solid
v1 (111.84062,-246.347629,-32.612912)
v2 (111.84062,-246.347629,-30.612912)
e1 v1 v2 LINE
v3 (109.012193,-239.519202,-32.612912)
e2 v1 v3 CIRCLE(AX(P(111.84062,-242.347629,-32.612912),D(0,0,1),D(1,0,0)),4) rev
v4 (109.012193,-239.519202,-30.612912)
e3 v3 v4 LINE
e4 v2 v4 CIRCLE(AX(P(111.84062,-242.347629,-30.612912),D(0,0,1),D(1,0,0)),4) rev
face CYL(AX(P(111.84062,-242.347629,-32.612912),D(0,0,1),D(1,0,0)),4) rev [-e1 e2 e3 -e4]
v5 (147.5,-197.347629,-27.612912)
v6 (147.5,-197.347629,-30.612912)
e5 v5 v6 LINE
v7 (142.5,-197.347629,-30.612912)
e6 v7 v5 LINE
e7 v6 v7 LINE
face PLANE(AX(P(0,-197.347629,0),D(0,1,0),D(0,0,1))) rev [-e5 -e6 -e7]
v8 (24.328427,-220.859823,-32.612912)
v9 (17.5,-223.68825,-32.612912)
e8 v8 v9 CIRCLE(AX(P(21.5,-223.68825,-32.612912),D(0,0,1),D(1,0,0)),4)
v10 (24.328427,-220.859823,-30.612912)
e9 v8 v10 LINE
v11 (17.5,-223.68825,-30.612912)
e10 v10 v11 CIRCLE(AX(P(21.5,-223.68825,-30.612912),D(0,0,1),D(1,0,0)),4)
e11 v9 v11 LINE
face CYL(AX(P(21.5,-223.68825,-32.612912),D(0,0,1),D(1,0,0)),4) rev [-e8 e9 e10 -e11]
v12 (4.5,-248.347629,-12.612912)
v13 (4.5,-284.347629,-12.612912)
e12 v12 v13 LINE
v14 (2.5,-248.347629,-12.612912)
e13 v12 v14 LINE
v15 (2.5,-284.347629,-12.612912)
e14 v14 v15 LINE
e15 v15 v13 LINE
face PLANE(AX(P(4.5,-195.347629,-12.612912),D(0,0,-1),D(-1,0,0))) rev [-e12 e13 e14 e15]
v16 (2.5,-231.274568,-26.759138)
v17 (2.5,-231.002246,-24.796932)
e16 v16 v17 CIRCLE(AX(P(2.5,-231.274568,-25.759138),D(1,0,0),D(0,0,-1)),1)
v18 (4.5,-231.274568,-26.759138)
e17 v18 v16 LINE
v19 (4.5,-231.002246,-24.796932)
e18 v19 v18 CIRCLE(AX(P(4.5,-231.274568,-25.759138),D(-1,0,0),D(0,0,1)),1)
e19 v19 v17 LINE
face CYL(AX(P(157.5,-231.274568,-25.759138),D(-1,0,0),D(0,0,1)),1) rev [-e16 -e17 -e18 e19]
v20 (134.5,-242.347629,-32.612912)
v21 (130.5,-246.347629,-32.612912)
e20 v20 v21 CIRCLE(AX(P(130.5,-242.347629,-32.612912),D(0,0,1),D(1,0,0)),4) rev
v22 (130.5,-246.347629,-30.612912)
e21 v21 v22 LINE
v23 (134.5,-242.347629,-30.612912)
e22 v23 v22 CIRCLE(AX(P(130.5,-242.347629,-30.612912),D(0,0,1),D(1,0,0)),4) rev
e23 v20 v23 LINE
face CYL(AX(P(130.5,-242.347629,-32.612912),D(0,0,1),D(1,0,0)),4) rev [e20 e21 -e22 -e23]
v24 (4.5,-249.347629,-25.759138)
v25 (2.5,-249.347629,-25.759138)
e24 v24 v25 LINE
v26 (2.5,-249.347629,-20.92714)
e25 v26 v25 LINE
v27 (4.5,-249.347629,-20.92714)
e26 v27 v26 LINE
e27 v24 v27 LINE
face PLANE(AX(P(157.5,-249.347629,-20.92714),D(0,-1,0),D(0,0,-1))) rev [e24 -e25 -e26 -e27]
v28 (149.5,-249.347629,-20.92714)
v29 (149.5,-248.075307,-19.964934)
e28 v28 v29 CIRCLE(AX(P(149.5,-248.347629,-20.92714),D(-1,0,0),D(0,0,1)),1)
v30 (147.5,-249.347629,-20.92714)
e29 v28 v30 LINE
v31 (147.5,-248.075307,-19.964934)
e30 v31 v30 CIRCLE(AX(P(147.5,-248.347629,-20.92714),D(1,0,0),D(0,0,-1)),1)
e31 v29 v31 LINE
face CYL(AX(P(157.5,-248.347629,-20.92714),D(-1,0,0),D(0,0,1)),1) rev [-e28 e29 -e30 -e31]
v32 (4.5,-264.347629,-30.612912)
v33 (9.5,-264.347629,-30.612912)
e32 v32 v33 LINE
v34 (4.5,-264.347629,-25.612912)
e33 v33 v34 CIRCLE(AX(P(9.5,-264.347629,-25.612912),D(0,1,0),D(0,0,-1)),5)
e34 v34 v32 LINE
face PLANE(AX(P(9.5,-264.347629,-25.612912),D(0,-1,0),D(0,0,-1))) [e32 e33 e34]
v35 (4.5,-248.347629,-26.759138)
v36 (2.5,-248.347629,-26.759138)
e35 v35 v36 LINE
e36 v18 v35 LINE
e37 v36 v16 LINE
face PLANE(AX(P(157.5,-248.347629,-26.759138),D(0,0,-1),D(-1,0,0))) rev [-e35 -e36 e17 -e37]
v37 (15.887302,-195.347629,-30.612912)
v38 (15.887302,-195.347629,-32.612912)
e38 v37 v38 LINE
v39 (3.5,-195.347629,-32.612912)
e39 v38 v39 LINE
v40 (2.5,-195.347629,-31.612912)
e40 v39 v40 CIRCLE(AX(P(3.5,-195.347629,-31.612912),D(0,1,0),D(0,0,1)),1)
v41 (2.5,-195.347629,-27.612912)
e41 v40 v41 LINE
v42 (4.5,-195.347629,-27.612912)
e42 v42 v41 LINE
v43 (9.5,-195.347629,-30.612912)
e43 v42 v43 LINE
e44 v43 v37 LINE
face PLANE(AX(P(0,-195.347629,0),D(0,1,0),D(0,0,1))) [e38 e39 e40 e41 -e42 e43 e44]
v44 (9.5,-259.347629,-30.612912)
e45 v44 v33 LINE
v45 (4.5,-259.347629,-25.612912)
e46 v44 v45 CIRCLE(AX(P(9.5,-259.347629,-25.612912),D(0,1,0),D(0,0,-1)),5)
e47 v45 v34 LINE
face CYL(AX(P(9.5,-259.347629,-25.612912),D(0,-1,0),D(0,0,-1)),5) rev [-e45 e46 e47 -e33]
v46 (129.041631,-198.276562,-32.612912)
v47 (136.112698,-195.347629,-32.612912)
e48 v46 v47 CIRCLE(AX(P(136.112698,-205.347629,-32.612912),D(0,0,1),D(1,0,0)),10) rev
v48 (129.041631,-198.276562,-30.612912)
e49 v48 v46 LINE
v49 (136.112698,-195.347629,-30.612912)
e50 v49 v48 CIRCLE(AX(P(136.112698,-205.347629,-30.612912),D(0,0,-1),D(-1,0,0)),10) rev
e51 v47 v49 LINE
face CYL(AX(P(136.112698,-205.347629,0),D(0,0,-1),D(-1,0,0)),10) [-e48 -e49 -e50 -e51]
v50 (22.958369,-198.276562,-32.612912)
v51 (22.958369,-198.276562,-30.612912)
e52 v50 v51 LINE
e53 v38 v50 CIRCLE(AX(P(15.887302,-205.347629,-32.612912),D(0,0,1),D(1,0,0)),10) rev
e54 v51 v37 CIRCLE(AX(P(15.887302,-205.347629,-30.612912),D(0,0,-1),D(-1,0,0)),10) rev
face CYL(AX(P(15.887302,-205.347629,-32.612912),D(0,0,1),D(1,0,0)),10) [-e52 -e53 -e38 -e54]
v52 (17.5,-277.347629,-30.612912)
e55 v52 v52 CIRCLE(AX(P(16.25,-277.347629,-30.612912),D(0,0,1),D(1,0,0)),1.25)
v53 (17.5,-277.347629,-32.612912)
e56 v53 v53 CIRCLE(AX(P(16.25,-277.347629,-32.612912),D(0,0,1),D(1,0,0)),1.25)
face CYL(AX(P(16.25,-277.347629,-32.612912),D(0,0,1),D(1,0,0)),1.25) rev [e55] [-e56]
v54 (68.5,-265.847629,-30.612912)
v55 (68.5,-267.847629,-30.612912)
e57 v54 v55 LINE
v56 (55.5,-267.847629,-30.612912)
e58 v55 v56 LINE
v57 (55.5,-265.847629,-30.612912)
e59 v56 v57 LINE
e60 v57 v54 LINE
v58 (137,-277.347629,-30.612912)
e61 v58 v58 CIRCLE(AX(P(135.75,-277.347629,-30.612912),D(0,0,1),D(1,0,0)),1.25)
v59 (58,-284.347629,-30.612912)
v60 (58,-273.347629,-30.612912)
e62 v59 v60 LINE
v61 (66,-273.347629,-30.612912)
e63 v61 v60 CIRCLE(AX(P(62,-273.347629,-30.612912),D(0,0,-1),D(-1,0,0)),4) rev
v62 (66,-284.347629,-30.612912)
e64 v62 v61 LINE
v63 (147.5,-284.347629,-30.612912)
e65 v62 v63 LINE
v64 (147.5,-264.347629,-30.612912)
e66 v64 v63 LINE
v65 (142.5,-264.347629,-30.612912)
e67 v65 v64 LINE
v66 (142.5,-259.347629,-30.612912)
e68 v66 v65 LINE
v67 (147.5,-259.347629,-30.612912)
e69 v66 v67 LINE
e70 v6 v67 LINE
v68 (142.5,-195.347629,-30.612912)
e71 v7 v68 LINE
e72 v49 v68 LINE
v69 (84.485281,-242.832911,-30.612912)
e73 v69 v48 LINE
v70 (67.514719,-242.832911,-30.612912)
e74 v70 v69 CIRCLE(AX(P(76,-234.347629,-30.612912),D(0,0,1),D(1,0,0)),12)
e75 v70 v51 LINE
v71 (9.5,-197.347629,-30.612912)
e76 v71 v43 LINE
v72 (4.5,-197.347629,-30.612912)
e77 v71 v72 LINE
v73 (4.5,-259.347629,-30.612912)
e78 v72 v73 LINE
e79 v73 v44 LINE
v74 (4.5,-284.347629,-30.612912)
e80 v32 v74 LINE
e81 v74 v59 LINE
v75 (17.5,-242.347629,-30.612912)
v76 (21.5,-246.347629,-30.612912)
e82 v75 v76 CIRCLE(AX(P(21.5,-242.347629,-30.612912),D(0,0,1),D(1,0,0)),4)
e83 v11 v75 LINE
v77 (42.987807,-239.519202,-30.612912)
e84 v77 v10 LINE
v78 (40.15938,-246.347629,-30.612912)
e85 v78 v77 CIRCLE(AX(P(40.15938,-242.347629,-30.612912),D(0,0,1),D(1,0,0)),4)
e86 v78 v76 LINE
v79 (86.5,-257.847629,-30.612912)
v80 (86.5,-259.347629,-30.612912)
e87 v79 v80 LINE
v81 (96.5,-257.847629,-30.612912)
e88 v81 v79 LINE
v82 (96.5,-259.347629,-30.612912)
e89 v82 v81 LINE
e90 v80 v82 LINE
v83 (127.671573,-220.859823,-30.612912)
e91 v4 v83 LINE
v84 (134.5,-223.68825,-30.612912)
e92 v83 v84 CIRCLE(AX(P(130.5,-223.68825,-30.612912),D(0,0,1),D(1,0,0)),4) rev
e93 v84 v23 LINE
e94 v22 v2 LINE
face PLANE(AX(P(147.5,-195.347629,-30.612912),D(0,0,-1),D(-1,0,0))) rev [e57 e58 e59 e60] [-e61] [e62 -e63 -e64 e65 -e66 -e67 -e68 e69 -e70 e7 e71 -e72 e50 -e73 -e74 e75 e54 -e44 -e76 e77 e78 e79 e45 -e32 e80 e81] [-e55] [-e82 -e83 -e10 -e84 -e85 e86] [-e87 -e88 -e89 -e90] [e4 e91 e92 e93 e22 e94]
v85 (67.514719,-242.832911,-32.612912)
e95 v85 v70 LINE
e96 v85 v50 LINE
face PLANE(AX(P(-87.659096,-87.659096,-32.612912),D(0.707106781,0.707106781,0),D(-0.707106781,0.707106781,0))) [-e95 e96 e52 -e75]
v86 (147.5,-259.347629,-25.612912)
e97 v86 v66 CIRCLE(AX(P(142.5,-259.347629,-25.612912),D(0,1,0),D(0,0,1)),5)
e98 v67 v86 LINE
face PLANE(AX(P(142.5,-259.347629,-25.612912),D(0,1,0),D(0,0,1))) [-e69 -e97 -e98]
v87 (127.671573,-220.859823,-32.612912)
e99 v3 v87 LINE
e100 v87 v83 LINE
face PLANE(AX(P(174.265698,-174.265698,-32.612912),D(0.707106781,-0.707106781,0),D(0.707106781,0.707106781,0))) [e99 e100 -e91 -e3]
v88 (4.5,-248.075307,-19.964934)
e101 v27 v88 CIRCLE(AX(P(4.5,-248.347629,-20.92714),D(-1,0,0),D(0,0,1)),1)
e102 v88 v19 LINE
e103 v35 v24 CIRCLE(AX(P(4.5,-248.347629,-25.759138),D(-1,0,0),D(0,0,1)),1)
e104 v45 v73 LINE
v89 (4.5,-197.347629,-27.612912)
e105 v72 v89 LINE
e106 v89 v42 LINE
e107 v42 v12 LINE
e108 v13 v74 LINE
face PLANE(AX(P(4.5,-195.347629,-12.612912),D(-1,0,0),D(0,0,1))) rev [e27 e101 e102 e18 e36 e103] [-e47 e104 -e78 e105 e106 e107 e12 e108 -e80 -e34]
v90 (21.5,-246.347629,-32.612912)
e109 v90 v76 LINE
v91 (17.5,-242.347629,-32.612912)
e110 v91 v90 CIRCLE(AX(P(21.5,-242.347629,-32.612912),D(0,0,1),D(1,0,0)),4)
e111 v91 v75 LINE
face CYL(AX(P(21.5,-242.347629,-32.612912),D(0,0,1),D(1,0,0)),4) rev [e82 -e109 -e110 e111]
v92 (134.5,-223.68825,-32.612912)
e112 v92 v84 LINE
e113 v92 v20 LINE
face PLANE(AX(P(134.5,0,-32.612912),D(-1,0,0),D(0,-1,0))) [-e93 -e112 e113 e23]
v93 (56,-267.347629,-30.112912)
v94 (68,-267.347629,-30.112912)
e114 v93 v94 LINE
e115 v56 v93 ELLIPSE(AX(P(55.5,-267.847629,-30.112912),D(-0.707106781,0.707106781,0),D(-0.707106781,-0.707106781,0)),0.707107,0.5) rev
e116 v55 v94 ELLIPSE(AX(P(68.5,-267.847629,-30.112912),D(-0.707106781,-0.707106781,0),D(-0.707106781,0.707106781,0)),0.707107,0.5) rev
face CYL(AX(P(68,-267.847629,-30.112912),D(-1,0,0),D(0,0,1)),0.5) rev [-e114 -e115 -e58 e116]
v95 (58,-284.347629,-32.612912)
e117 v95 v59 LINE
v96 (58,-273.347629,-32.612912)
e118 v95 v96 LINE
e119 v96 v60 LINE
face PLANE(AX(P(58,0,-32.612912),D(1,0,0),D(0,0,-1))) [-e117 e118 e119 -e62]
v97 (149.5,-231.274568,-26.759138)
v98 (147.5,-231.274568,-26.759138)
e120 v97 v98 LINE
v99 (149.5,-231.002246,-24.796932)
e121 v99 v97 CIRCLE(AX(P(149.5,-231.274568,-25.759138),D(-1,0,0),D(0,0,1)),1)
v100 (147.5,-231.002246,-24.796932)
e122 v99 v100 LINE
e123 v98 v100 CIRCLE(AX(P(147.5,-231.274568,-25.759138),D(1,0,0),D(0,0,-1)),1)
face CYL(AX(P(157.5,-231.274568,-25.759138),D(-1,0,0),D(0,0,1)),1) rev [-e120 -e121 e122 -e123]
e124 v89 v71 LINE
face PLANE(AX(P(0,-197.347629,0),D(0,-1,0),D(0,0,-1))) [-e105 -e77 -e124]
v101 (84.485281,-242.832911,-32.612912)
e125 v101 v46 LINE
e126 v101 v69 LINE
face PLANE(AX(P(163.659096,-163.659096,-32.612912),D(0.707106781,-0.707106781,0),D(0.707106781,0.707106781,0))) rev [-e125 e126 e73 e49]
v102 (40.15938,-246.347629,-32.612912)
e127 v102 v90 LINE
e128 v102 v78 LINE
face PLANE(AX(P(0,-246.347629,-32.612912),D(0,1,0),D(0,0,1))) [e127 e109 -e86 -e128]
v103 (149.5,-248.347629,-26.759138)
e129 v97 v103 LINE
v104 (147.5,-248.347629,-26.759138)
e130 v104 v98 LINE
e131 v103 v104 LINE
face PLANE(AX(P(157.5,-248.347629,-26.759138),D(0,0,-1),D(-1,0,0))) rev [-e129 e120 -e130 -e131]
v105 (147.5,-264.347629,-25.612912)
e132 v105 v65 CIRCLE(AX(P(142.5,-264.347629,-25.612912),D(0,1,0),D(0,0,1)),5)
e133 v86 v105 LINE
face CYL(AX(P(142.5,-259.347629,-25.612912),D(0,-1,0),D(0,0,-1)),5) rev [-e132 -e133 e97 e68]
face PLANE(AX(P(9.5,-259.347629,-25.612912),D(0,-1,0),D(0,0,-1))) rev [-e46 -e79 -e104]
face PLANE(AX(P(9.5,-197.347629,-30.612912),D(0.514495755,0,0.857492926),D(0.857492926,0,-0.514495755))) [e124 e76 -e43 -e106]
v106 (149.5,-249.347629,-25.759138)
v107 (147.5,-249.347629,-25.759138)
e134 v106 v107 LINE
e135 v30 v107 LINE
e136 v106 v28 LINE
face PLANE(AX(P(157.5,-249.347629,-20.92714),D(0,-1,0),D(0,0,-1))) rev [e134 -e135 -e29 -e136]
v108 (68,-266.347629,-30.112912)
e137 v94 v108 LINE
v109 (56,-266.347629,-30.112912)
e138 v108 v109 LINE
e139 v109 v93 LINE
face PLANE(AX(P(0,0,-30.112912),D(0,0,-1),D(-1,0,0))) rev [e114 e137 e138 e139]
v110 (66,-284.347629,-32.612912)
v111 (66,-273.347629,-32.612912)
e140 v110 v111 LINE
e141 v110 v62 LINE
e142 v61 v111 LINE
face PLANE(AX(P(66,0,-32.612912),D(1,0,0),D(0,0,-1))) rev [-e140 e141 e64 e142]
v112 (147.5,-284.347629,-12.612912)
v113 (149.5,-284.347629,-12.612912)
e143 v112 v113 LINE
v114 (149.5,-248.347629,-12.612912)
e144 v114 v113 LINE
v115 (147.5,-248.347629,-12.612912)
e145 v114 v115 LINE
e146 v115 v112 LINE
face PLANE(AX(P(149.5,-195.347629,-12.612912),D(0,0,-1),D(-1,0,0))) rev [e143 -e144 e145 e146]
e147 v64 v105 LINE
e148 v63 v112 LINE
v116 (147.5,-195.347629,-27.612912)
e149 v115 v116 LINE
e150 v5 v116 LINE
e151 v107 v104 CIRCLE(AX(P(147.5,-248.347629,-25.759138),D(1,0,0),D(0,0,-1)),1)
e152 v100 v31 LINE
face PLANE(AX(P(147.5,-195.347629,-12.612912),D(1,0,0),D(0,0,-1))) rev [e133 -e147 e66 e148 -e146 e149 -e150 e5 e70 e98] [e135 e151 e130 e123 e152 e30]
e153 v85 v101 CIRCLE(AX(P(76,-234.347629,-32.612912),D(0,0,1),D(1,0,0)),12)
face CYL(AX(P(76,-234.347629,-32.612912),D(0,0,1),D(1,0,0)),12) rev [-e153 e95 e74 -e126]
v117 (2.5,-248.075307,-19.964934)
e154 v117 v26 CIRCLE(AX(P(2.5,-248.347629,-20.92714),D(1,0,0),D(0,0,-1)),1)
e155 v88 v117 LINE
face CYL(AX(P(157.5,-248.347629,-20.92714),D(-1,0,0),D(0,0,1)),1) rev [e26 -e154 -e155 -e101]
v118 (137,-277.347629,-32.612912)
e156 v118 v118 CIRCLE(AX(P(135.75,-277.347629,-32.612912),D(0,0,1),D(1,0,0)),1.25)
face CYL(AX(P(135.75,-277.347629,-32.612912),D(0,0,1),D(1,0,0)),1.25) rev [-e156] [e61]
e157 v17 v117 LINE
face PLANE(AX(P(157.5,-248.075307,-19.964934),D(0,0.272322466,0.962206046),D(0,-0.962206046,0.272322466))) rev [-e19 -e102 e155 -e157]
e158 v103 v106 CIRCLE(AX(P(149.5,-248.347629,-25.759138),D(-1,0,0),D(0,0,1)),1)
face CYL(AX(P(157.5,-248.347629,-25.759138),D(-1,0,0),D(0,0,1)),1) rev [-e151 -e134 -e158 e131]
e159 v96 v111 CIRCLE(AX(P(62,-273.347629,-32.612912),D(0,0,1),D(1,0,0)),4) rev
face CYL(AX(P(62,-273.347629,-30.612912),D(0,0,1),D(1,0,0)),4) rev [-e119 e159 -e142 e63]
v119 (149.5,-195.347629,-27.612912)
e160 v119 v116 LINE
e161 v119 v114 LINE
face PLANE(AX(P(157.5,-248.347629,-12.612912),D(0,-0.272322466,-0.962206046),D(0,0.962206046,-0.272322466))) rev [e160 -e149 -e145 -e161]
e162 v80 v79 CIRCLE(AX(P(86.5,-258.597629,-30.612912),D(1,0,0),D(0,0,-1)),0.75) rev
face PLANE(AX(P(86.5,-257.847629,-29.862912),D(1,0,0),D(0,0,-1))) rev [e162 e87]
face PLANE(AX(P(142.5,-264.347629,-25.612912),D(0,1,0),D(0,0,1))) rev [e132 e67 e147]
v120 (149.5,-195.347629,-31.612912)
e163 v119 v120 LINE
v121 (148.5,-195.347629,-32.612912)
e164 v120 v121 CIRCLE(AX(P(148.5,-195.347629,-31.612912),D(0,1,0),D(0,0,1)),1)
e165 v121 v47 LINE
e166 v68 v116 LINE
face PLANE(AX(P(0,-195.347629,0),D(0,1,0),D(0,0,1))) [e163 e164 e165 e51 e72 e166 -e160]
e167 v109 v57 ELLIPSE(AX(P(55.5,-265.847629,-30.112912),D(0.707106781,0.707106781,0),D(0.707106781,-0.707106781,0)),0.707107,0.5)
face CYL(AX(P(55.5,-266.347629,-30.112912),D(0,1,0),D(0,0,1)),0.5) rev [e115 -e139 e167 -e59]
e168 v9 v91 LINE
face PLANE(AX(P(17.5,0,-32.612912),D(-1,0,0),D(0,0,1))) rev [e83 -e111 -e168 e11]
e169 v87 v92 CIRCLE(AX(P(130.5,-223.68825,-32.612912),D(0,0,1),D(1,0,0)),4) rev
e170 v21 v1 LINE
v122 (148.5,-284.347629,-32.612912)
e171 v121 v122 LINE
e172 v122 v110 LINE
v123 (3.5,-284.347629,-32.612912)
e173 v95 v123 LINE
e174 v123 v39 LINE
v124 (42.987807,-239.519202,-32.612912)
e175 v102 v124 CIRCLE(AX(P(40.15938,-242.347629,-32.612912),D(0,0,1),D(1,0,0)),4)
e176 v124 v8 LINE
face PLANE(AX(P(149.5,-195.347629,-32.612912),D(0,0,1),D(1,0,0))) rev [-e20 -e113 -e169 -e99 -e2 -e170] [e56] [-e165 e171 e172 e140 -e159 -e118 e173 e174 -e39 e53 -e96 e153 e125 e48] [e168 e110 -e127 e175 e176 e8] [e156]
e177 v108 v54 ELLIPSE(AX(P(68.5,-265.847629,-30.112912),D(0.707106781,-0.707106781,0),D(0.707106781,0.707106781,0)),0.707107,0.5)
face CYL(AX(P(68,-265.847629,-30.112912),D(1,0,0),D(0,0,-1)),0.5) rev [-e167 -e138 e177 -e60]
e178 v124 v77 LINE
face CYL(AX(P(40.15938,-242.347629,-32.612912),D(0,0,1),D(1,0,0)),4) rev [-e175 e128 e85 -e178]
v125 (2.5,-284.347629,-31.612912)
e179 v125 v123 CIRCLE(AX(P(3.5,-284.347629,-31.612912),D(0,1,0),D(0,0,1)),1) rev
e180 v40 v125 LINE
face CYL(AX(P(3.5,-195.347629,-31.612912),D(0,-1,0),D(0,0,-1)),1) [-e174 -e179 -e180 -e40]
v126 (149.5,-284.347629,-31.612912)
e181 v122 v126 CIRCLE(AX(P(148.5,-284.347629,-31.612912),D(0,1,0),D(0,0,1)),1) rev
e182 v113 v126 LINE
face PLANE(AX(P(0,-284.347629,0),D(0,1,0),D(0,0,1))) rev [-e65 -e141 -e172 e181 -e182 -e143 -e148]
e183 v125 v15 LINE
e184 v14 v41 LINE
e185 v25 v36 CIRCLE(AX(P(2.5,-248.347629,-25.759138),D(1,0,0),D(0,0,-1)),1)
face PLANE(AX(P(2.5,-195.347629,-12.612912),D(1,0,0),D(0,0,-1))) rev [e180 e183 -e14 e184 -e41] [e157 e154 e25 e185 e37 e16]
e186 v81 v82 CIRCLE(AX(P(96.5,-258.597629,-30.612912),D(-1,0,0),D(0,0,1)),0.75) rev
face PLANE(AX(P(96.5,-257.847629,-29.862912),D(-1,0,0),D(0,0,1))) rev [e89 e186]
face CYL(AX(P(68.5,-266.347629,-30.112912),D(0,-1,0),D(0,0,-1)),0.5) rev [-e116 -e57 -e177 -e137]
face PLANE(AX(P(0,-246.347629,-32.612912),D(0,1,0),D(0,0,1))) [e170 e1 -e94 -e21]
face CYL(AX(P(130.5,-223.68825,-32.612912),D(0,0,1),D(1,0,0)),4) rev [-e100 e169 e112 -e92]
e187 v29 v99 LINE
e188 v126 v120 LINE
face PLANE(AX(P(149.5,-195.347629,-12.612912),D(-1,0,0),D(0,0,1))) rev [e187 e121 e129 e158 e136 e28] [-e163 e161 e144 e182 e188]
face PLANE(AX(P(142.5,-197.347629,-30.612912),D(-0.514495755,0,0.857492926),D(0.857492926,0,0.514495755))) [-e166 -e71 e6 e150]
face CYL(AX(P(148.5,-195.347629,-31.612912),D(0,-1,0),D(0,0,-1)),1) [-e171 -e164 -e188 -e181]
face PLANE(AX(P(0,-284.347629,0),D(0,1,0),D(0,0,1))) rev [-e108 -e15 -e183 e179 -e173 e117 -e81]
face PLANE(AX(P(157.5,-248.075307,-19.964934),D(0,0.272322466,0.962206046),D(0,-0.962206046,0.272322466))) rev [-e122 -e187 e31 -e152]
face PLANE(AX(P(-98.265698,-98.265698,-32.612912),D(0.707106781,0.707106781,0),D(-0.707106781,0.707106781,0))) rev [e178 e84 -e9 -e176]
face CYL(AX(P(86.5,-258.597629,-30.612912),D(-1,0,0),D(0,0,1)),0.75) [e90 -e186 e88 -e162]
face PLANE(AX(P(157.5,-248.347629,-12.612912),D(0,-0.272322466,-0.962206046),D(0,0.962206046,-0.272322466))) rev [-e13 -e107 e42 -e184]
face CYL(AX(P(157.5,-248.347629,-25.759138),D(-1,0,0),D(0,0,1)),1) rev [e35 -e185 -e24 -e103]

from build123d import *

# Parameters (mm, degrees)
RESSALTO_EXTRUS_O3_DEPTH   = 89
FILETE3_R                  = 1
ESBO_O16_W                 = 12
ESBO_O16_H                 = 1
RESSALTO_EXTRUS_O5_DEPTH   = 0.5
FILETE7_R                  = 0.5
CORTE_EXTRUS_O9_DEPTH      = 200
CORTE_EXTRUS_O9_DEPTH_BACK = 10
ESBO_O22_R                 = 1.25
ESBO_O22_W                 = 8
ESBO_O22_H                 = 15
CORTE_EXTRUS_O10_DEPTH     = 322.757399842
RESSALTO_EXTRUS_O8_DEPTH   = 2
FILETE12_R                 = 10
FILETE13_R                 = 4
ESBO_O30_W                 = 10
ESBO_O30_H                 = 1.5
RESSALTO_EXTRUS_O10_DEPTH  = 0.75
FILETE14_R                 = 0.75
RESSALTO_EXTRUS_O11_START  = -20
RESSALTO_EXTRUS_O11_DEPTH  = 5


with BuildPart() as part:
    # Esboço6 → Ressalto-extrusão3 (new body)
    with BuildSketch(Plane(origin=(0, -284.347629413, 0), x_dir=(1, 0, 0), z_dir=(0, 1, 0))):
        Polygon((4.5, 12.61291239), (2.5, 12.61291239), (2.5, 32.61291239), (149.5, 32.61291239), (149.5, 12.61291239), (147.5, 12.61291239), (147.5, 30.61291239), (4.5, 30.61291239), align=None)
    extrude(amount=RESSALTO_EXTRUS_O3_DEPTH)

    # Filete3
    filete3_edges = [part.edges().sort_by_distance(p)[0] for p in [
        (2.5, -239.847629413, -32.61291239),
        (149.5, -239.847629413, -32.61291239),
    ]]
    fillet(filete3_edges, radius=FILETE3_R)

    # Esboço16 → Ressalto-extrusão5 (add)
    with BuildSketch(Plane.XY.offset(-30.61291239)):
        with Locations((62, -266.847629413)):
            Rectangle(ESBO_O16_W, ESBO_O16_H)
    extrude(amount=RESSALTO_EXTRUS_O5_DEPTH)

    # Filete7
    filete7_edges = [part.edges().sort_by_distance(p)[0] for p in [
        (56, -266.847629413, -30.61291239),
        (68, -266.847629413, -30.61291239),
        (62, -266.347629413, -30.61291239),
        (62, -267.347629413, -30.61291239),
    ]]
    fillet(filete7_edges, radius=FILETE7_R - 0.0001)  # a hair under: the kernel refuses the full size

    # Esboço20 → Corte-extrusão9 (cut, two sides: drawn at the far end of the back side and taken through both)
    with BuildSketch(Plane.ZY.offset(-147.5).offset(-CORTE_EXTRUS_O9_DEPTH_BACK)):
        Polygon((-27.61291239, -195.347629413), (-12.61291239, -195.347629413), (-12.61291239, -248.347629413), align=None)
        with BuildLine():
            Line((-19.964933879, -248.075306948), (-24.796932275, -231.002245945))
            ThreePointArc((-24.796932275, -231.002245945), (-25.896604597, -230.284061963), (-26.759138321, -231.274568411))
            Line((-26.759138321, -231.274568411), (-26.759138321, -248.347629413))
            ThreePointArc((-26.759138321, -248.347629413), (-26.466245102, -249.054736195), (-25.759138321, -249.347629413))
            Line((-25.759138321, -249.347629413), (-20.927139924, -249.347629413))
            ThreePointArc((-20.927139924, -249.347629413), (-20.129542762, -248.950819903), (-19.964933879, -248.075306948))
        make_face()
    extrude(amount=CORTE_EXTRUS_O9_DEPTH + CORTE_EXTRUS_O9_DEPTH_BACK, mode=Mode.SUBTRACT)

    # Esboço22 → Corte-extrusão10 (cut, through all)
    with BuildSketch(Plane.XY.offset(-30.61291239)):
        with Locations((16.25, -277.347629413)):
            Circle(ESBO_O22_R)
        with Locations((135.75, -277.347629413)):
            Circle(ESBO_O22_R)
        with BuildLine():
            Line((131.970562748, -195.347629413), (20.029437252, -195.347629413))
            Line((20.029437252, -195.347629413), (67.514718626, -242.832910788))
            ThreePointArc((67.514718626, -242.832910788), (76, -246.347629413), (84.485281374, -242.832910788))
            Line((84.485281374, -242.832910788), (131.970562748, -195.347629413))
        make_face()
        with BuildLine():
            Line((134.5, -223.688249847), (134.5, -242.347629413))
            ThreePointArc((134.5, -242.347629413), (133.328427125, -245.176056538), (130.5, -246.347629413))
            Line((130.5, -246.347629413), (111.840620434, -246.347629413))
            ThreePointArc((111.840620434, -246.347629413), (108.145102304, -243.878363143), (109.012193309, -239.519202289))
            Line((109.012193309, -239.519202289), (127.671572875, -220.859822722))
            ThreePointArc((127.671572875, -220.859822722), (132.030733729, -219.992731717), (134.5, -223.688249847))
        make_face()
        with BuildLine():
            Line((17.5, -223.688249847), (17.5, -242.347629413))
            ThreePointArc((17.5, -242.347629413), (18.671572875, -245.176056538), (21.5, -246.347629413))
            Line((21.5, -246.347629413), (40.159379566, -246.347629413))
            ThreePointArc((40.159379566, -246.347629413), (43.854897696, -243.878363143), (42.987806691, -239.519202289))
            Line((42.987806691, -239.519202289), (24.328427125, -220.859822722))
            ThreePointArc((24.328427125, -220.859822722), (19.969266271, -219.992731717), (17.5, -223.688249847))
        make_face()
        with Locations((62, -276.847629413)):
            Rectangle(ESBO_O22_W, ESBO_O22_H)
    extrude(amount=-CORTE_EXTRUS_O10_DEPTH, mode=Mode.SUBTRACT)

    # Esboço25 → Ressalto-extrusão8 (add)
    with BuildSketch(Plane(origin=(0, -195.347629413, 0), x_dir=(1, 0, 0), z_dir=(0, 1, 0))):
        Polygon((147.5, 30.61291239), (142.5, 30.61291239), (147.5, 27.61291239), align=None)
        Polygon((4.5, 30.61291239), (9.5, 30.61291239), (4.5, 27.61291239), align=None)
    extrude(amount=-RESSALTO_EXTRUS_O8_DEPTH)

    # Filete12
    filete12_edges = [part.edges().sort_by_distance(p)[0] for p in [
        (20.029437252, -195.347629413, -31.61291239),
        (131.970562748, -195.347629413, -31.61291239),
    ]]
    fillet(filete12_edges, radius=FILETE12_R)

    # Filete13
    filete13_edges = [part.edges().sort_by_distance(p)[0] for p in [
        (58, -269.347629413, -31.61291239),
        (66, -269.347629413, -31.61291239),
    ]]
    fillet(filete13_edges, radius=FILETE13_R - 0.0001)  # a hair under: the kernel refuses the full size

    # Esboço30 → Ressalto-extrusão10 (add)
    with BuildSketch(Plane.XY.offset(-30.61291239)):
        with Locations((91.5, -258.597629413)):
            Rectangle(ESBO_O30_W, ESBO_O30_H)
    extrude(amount=RESSALTO_EXTRUS_O10_DEPTH)

    # Filete14
    filete14_edges = [part.edges().sort_by_distance(p)[0] for p in [
        (91.5, -257.847629413, -29.86291239),
        (91.5, -259.347629413, -29.86291239),
    ]]
    fillet(filete14_edges, radius=FILETE14_R - 0.0001)  # a hair under: the kernel refuses the full size

    # Esboço31 → Ressalto-extrusão11 (add)
    with BuildSketch(Plane.XZ.offset(284.347629413).offset(RESSALTO_EXTRUS_O11_START)):
        with BuildLine():
            Line((147.5, -30.61291239), (142.5, -30.61291239))
            ThreePointArc((142.5, -30.61291239), (146.035533906, -29.148446296), (147.5, -25.61291239))
            Line((147.5, -25.61291239), (147.5, -30.61291239))
        make_face()
        with BuildLine():
            Line((4.5, -30.61291239), (9.5, -30.61291239))
            ThreePointArc((9.5, -30.61291239), (5.964466094, -29.148446296), (4.5, -25.61291239))
            Line((4.5, -25.61291239), (4.5, -30.61291239))
        make_face()
    extrude(amount=-RESSALTO_EXTRUS_O11_DEPTH)


solid = part.part
